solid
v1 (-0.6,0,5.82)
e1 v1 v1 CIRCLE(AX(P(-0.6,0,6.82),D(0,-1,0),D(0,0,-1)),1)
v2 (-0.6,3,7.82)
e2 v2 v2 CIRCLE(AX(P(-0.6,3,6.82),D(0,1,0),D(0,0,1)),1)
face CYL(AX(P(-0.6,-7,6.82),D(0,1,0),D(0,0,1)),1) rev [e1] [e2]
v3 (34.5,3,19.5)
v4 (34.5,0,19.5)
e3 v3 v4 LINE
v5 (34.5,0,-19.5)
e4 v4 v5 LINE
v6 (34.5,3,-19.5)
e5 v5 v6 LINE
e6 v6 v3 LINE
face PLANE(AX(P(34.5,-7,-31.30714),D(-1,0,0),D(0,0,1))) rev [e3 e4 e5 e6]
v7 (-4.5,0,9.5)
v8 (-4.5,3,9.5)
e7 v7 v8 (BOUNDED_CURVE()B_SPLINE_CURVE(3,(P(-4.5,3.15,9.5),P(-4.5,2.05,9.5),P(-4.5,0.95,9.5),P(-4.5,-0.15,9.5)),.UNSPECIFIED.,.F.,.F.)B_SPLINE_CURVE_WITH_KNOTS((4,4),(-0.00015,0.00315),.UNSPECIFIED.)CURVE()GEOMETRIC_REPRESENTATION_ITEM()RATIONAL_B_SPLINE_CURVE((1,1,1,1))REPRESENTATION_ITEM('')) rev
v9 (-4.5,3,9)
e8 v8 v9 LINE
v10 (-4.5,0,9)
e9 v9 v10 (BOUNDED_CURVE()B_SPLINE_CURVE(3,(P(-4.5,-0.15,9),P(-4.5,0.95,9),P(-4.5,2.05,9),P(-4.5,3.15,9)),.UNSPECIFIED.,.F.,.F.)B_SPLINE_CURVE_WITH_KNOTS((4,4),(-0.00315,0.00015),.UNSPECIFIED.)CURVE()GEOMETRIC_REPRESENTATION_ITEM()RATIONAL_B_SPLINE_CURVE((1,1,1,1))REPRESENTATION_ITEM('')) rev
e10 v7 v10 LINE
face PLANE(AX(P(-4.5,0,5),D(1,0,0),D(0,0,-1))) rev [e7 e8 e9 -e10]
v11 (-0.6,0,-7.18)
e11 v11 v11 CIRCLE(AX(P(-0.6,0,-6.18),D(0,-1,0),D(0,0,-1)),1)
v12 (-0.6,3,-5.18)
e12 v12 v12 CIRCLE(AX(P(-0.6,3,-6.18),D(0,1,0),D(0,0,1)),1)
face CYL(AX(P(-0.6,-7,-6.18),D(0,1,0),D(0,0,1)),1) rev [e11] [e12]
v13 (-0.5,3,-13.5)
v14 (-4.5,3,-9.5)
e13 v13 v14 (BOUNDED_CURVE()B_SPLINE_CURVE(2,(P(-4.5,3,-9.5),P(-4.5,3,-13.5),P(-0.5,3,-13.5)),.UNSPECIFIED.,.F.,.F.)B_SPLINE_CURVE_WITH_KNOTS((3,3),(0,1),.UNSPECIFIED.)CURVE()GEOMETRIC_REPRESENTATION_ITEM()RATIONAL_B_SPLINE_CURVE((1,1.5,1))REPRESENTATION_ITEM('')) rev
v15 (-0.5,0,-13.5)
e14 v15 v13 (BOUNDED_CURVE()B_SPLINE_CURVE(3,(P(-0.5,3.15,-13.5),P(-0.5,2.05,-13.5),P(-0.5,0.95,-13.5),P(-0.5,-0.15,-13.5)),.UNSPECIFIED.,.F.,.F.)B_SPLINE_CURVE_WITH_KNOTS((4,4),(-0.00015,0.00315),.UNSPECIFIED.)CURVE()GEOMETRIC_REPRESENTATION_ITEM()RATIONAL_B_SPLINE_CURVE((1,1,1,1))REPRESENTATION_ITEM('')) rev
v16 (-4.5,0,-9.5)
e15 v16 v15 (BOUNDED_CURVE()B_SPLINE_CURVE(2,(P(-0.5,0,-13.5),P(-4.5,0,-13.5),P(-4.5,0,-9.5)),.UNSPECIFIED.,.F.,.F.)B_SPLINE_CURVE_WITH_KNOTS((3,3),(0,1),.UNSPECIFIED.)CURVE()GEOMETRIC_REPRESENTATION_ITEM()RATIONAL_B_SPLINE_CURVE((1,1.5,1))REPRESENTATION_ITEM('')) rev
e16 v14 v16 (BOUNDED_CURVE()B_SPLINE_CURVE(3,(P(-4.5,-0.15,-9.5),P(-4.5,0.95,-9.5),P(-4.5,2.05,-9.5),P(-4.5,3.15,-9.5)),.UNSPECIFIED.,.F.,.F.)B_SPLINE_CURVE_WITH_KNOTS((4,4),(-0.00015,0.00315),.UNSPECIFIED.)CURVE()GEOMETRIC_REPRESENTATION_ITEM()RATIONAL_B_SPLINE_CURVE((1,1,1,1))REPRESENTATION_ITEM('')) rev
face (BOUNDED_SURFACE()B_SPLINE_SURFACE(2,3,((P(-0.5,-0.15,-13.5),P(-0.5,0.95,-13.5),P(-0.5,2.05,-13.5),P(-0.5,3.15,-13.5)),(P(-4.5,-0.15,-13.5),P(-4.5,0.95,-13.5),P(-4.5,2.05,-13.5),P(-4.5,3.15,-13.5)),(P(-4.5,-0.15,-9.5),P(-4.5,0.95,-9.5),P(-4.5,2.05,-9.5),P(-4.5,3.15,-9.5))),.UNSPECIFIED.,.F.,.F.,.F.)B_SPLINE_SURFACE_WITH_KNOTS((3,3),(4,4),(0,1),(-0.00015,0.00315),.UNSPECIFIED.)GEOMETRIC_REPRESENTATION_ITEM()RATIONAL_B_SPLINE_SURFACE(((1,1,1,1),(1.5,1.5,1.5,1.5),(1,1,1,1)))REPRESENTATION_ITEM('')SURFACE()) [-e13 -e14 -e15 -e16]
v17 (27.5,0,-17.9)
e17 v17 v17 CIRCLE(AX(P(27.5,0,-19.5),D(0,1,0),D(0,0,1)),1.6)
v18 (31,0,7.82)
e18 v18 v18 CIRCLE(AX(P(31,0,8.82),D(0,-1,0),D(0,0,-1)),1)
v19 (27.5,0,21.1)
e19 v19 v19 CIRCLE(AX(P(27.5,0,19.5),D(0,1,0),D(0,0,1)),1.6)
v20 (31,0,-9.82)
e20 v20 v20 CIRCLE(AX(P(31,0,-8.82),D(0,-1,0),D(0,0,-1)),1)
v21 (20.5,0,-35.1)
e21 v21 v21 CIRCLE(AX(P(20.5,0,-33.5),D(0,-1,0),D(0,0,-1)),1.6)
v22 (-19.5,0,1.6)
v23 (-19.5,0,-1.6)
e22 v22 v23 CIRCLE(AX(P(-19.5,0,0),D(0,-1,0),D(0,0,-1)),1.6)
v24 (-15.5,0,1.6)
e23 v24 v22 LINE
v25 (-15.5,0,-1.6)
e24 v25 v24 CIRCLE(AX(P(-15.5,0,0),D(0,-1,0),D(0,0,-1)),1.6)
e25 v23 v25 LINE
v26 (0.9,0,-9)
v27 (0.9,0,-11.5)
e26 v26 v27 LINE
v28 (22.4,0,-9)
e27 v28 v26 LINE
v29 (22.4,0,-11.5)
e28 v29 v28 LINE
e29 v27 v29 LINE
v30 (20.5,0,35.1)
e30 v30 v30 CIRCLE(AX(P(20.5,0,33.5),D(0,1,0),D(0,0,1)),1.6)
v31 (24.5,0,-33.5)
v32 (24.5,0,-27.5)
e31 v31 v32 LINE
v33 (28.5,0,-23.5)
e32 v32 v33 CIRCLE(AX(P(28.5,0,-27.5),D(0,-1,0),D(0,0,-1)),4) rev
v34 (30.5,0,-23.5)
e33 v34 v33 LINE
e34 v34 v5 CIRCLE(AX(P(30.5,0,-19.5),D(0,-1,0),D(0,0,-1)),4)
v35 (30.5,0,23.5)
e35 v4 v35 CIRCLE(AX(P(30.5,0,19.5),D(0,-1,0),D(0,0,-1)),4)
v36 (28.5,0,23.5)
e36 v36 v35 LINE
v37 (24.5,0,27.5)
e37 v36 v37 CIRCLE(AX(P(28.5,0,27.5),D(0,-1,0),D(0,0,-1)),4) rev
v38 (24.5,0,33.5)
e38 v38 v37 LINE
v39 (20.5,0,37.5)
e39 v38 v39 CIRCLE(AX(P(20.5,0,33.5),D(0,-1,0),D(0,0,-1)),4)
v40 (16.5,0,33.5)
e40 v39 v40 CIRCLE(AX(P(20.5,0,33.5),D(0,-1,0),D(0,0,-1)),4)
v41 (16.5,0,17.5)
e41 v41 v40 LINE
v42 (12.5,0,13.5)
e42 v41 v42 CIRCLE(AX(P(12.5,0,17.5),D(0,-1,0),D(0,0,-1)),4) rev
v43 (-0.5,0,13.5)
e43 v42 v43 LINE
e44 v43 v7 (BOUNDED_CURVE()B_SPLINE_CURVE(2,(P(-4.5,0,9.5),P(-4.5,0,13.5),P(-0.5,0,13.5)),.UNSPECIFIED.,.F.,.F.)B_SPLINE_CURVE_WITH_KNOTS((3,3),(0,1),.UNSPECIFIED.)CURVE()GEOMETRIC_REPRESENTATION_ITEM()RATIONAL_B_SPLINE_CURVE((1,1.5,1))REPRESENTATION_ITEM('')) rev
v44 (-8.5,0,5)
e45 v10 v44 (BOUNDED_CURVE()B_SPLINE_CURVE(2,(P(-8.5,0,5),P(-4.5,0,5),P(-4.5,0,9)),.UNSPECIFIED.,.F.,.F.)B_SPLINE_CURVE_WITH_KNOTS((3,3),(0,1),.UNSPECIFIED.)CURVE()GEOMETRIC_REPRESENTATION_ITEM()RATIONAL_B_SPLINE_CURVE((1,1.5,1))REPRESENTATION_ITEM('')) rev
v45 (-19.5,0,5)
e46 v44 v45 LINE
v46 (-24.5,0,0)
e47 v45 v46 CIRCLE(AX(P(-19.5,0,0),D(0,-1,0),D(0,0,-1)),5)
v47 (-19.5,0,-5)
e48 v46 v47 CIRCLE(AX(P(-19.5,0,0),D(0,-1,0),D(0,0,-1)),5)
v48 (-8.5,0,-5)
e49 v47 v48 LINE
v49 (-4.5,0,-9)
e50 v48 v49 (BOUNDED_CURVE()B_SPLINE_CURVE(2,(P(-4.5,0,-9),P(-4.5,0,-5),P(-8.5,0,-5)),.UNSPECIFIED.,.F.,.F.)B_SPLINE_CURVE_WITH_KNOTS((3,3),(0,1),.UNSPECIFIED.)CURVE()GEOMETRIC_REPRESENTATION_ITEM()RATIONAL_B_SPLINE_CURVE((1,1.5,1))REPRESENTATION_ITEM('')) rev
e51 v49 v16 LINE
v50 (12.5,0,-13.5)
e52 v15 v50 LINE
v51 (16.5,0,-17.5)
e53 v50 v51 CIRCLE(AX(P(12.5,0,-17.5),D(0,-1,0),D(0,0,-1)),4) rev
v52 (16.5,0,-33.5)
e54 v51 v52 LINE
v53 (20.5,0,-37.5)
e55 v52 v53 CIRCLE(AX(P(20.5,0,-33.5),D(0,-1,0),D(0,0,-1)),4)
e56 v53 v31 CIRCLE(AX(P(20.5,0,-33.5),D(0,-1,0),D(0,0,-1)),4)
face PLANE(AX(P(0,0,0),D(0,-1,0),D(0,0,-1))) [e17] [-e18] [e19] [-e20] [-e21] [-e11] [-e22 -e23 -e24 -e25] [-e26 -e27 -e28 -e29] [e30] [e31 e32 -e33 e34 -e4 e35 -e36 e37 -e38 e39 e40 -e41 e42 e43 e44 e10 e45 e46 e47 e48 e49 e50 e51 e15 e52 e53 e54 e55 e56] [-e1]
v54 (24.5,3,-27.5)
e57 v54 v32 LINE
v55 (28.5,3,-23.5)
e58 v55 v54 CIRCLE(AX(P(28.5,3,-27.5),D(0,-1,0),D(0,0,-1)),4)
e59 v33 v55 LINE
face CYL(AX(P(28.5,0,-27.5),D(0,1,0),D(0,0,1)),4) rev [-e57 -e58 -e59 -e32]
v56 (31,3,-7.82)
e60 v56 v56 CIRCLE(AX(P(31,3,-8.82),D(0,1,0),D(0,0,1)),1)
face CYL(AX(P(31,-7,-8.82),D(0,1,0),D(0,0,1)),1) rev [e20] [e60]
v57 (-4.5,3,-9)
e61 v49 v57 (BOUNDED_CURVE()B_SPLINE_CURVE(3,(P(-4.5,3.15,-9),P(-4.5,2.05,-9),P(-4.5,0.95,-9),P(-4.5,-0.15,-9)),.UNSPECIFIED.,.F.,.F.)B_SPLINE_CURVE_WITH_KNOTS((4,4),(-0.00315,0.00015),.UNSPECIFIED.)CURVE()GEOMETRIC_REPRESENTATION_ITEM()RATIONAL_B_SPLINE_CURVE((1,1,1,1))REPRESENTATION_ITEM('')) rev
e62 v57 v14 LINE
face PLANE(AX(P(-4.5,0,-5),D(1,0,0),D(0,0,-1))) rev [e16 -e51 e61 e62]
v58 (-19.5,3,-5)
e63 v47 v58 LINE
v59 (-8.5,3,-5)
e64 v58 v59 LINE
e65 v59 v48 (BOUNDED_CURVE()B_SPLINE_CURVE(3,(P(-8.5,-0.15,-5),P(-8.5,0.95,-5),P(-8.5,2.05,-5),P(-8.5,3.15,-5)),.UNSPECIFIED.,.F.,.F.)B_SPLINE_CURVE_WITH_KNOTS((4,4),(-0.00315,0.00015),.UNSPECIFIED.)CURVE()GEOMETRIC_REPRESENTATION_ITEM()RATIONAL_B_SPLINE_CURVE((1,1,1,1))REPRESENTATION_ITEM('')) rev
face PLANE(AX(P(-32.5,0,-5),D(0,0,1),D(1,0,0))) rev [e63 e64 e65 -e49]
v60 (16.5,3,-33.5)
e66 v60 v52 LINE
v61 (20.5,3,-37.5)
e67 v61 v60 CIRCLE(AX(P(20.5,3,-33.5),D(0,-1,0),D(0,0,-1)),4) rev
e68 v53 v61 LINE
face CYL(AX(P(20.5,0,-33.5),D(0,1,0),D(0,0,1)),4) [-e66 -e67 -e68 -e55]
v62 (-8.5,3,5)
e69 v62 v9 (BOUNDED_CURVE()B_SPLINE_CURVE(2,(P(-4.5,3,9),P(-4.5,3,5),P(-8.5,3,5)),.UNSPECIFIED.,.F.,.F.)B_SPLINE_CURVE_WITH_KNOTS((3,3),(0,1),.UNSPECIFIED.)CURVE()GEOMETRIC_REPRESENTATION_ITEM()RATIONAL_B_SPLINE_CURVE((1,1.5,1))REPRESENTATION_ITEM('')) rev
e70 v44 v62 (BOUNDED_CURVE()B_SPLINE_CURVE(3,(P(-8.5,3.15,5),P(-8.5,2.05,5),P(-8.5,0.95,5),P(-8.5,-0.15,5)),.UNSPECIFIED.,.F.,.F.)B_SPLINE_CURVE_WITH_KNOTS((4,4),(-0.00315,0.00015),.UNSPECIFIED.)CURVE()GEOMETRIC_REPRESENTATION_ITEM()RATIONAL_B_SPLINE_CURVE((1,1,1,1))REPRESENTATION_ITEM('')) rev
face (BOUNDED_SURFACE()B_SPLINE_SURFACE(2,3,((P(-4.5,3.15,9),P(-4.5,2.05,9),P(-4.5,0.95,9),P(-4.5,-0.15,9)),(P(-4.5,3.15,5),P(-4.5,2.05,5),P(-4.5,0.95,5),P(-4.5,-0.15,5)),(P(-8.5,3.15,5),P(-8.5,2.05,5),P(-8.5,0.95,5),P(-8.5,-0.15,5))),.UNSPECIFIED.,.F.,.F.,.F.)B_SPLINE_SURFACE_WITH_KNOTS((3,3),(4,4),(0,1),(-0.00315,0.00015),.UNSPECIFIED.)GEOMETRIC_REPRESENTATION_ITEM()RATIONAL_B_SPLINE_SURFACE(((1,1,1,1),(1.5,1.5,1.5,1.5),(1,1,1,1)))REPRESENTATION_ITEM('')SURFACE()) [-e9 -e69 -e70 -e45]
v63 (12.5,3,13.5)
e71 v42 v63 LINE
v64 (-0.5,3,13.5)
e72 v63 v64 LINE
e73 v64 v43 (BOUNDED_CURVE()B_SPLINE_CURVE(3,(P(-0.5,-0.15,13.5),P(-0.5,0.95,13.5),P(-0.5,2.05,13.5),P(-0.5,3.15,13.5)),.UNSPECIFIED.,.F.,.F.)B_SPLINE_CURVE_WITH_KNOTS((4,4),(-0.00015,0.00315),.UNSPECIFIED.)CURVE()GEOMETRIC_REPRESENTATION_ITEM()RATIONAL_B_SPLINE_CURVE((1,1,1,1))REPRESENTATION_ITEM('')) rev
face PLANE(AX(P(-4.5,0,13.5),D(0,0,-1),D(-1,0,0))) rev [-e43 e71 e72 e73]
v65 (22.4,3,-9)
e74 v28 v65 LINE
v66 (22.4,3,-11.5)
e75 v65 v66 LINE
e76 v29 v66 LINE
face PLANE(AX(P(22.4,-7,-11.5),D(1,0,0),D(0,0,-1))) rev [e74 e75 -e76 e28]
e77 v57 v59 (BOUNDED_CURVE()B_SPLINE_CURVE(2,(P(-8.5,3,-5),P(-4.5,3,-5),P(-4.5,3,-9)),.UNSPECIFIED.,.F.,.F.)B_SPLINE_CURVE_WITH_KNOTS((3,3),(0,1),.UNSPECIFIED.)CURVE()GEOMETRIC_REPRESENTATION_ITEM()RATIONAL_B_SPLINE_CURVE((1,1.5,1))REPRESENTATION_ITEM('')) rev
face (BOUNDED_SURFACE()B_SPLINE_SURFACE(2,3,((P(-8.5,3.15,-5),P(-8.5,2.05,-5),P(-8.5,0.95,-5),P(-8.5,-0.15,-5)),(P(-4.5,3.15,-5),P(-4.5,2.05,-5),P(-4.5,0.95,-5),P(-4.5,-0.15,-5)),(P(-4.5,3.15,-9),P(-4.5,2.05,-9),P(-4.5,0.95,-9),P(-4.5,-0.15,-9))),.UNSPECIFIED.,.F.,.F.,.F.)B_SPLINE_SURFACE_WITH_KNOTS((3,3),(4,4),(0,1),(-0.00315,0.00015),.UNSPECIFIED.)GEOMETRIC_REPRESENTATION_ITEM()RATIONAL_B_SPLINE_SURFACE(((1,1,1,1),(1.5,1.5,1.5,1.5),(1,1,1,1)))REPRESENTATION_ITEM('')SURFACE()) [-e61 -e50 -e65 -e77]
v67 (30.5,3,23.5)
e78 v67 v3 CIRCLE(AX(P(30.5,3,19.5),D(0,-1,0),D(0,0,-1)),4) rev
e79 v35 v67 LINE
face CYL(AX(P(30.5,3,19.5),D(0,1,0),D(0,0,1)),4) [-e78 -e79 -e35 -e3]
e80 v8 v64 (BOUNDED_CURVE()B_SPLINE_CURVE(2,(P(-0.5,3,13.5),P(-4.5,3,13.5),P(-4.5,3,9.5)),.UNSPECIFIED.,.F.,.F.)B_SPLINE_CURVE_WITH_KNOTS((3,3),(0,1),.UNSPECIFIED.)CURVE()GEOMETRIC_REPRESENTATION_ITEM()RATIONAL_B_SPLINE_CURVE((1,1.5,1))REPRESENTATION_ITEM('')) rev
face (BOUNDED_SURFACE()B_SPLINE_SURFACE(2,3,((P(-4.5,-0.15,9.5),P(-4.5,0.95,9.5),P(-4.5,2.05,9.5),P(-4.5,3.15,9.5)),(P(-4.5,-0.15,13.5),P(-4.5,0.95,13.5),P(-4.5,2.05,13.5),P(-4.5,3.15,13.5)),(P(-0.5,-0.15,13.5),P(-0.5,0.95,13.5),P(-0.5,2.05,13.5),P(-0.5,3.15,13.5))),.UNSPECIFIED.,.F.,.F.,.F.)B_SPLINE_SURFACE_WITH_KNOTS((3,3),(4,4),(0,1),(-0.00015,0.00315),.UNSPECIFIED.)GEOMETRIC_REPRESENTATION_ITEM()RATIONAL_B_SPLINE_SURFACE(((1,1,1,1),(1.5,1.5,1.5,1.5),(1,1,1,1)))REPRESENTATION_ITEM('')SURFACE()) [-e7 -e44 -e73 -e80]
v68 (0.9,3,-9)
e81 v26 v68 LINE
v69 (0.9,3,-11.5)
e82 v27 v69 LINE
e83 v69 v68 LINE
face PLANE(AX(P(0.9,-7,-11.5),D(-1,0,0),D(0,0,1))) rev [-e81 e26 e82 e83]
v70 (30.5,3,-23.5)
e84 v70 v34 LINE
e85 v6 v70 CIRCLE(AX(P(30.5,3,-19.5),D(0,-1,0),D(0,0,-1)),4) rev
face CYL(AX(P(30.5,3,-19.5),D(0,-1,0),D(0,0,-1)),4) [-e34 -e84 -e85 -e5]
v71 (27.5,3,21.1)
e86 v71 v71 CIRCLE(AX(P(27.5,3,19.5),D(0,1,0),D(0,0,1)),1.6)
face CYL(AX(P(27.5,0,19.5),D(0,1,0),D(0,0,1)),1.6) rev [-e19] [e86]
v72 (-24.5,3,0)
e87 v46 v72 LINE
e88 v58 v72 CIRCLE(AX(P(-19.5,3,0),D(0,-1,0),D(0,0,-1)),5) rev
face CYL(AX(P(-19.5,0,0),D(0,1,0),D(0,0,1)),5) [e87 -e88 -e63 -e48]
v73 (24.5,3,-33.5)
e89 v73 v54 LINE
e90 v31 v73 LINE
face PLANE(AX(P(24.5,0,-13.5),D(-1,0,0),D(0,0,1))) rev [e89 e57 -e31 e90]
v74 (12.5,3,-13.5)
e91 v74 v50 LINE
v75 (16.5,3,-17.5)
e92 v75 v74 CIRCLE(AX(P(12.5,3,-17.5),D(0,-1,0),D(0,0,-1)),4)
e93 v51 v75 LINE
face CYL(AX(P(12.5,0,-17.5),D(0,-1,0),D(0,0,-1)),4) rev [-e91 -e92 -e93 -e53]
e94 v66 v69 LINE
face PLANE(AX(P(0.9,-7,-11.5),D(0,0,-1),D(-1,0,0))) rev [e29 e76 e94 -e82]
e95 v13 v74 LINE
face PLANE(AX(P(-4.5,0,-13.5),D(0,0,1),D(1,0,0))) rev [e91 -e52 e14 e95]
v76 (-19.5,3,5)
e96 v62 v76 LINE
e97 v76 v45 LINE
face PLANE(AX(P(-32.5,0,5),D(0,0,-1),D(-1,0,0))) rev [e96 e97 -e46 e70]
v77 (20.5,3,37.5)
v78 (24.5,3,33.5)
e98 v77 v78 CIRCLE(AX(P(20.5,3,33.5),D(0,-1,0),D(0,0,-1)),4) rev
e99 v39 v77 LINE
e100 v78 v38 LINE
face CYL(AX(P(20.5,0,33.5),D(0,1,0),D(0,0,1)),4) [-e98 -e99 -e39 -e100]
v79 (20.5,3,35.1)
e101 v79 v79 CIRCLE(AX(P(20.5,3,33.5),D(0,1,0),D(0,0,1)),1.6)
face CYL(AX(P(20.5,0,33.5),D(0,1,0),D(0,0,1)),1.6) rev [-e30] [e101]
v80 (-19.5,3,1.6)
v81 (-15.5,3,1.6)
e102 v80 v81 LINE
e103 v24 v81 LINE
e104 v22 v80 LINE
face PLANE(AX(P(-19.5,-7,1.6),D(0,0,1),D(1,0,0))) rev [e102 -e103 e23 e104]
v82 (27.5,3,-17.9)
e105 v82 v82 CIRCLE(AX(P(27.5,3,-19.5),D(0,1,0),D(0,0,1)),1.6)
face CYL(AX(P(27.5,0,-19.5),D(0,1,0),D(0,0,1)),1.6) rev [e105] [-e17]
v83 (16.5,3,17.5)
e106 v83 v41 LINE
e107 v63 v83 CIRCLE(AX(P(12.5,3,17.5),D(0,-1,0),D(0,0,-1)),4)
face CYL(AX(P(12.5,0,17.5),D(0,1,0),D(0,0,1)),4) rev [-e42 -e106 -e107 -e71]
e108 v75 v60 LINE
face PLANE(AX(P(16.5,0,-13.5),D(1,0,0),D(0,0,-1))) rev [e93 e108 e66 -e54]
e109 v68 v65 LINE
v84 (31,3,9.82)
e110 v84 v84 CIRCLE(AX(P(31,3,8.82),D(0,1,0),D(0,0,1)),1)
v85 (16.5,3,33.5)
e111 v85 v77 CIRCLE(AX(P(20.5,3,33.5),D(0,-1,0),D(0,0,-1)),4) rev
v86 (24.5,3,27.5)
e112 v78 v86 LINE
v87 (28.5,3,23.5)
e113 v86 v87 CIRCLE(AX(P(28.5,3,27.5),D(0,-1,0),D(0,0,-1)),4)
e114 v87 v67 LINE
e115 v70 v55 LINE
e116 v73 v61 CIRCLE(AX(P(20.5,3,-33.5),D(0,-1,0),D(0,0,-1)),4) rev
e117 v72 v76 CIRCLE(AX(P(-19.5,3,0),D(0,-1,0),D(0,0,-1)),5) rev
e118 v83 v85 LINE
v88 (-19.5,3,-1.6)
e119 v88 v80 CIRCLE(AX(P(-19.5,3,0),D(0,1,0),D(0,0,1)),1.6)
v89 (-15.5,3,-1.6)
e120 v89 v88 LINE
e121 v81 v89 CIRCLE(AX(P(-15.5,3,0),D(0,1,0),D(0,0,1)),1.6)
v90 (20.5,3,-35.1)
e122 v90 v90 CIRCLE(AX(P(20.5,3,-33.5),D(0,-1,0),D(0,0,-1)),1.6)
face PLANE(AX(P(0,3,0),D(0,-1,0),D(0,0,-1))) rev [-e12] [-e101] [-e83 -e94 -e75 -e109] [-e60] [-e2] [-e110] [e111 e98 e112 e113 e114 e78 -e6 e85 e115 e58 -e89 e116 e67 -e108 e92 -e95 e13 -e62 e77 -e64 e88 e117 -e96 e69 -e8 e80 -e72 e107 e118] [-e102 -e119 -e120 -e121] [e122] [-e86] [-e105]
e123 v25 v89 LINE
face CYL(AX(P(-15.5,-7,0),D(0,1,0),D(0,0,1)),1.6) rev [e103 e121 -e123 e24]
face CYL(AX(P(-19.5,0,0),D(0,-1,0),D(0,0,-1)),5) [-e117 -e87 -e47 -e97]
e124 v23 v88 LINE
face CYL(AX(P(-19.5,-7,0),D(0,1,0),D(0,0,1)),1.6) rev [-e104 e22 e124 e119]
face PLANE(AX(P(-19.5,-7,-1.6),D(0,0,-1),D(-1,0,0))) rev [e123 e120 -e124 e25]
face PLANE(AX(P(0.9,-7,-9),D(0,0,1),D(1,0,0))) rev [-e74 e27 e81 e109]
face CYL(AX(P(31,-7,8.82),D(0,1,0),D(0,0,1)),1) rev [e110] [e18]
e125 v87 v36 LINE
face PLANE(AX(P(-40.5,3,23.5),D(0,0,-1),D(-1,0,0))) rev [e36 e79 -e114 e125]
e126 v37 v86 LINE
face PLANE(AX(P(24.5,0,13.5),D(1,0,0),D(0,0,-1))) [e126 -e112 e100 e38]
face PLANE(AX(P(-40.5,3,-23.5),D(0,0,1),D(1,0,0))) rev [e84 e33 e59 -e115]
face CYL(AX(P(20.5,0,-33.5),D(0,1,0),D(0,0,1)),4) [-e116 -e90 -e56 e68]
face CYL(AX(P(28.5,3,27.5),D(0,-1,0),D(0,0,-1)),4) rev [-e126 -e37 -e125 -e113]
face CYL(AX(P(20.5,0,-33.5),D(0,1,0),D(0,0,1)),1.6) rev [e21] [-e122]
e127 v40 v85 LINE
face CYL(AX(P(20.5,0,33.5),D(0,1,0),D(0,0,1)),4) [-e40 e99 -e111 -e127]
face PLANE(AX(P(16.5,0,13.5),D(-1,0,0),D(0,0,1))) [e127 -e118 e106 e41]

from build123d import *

# Parameters (mm, degrees)
CROQUIS1_W              = 81
CROQUIS1_H              = 47
SALIENTE_EXTRUIR1_DEPTH = 3
CORTAR_EXTRUIR2_DEPTH   = 47.920144927
CROQUIS2_R              = 1.6
CORTAR_EXTRUIR1_DEPTH   = 47.920144927
CROQUIS5_R              = 1
CROQUIS5_W              = 16
CROQUIS5_H              = 59.242740908
CROQUIS5_W_2            = 21.5
CROQUIS5_H_2            = 2.5
CORTAR_EXTRUIR4_DEPTH   = 10
CORTAR_EXTRUIR5_DEPTH   = 10
CROQUIS7_W              = 27.893037997
CROQUIS7_H              = 58.785327392
CORTAR_EXTRUIR6_DEPTH   = 10
CROQUIS8_W              = 8
CROQUIS8_H              = 24
CROQUIS8_R              = 1.6
SALIENTE_EXTRUIR2_DEPTH = 3
REDONDEO1_R             = 4
REDONDEO4_R             = 5
REDONDEO3_SIZE          = 4


# Some blends are built 0.0001 mm under size
with BuildPart() as part:
    # Croquis1 → Saliente-Extruir1 (new body)
    with BuildSketch(Plane(origin=(0, 0, 0), x_dir=(1, 0, 0), z_dir=(0, 1, 0))):
        Rectangle(CROQUIS1_W, CROQUIS1_H)
    extrude(amount=SALIENTE_EXTRUIR1_DEPTH)

    # Croquis3 → Cortar-Extruir2 (cut, through all)
    with BuildSketch(Plane(origin=(0, 3, 0), x_dir=(1, 0, 0), z_dir=(0, 1, 0))):
        Polygon((-32.5, 23.5), (23.5, 23.5), (23.5, 13.5), (-4.5, 13.5), (-4.5, 5), (-32.5, 5), align=None)
        Polygon((-32.5, -5), (-32.5, -23.5), (23.5, -23.5), (23.5, -13.5), (-4.5, -13.5), (-4.5, -5), align=None)
    extrude(amount=-CORTAR_EXTRUIR2_DEPTH, mode=Mode.SUBTRACT)

    # Croquis2 → Cortar-Extruir1 (cut, through all)
    with BuildSketch(Plane(origin=(0, 3, 0), x_dir=(1, 0, 0), z_dir=(0, 1, 0))):
        with Locations(Location((-36.5, 19.5, 0), (0, 0, 270))):
            Circle(CROQUIS2_R)
        with Locations(Location((-36.5, -19.5, 0), (0, 0, 270))):
            Circle(CROQUIS2_R)
        with Locations(Location((27.5, 19.5, 0), (0, 0, 270))):
            Circle(CROQUIS2_R)
        with Locations(Location((27.5, -19.5, 0), (0, 0, 270))):
            Circle(CROQUIS2_R)
        with Locations(Location((-36.5, 11.5, 0), (0, 0, 270))):
            Circle(CROQUIS2_R)
        with Locations(Location((-36.5, -11.5, 0), (0, 0, 270))):
            Circle(CROQUIS2_R)
    extrude(amount=-CORTAR_EXTRUIR1_DEPTH, mode=Mode.SUBTRACT)

    # Croquis5 → Cortar-Extruir4 (cut)
    with BuildSketch(Plane(origin=(0, 3, 0), x_dir=(1, 0, 0), z_dir=(0, 1, 0))):
        with Locations(Location((-0.6, 6.18, 0), (0, 0, 270))):
            Circle(CROQUIS5_R)
        with Locations(Location((31, 8.82, 0), (0, 0, 270))):
            Circle(CROQUIS5_R)
        with Locations(Location((31, -8.82, 0), (0, 0, 270))):
            Circle(CROQUIS5_R)
        with Locations(Location((-0.6, -6.82, 0), (0, 0, 270))):
            Circle(CROQUIS5_R)
        with Locations((42.5, 1.68576905)):
            Rectangle(CROQUIS5_W, CROQUIS5_H)
        with Locations((11.65, 10.25)):
            Rectangle(CROQUIS5_W_2, CROQUIS5_H_2)
    extrude(amount=-CORTAR_EXTRUIR4_DEPTH, mode=Mode.SUBTRACT)

    # Croquis6 → Cortar-Extruir5 (cut)
    with BuildSketch(Plane(origin=(0, 3, 0), x_dir=(1, 0, 0), z_dir=(0, 1, 0))):
        with BuildLine():
            Line((-19.5, 1.6), (-15.5, 1.6))
            ThreePointArc((-15.5, 1.6), (-13.9, 0), (-15.5, -1.6))
            Line((-15.5, -1.6), (-19.5, -1.6))
            ThreePointArc((-19.5, -1.6), (-21.1, 0), (-19.5, 1.6))
        make_face()
    extrude(amount=-CORTAR_EXTRUIR5_DEPTH, mode=Mode.SUBTRACT)

    # Croquis7 → Cortar-Extruir6 (cut)
    with BuildSketch(Plane(origin=(0, 3, 0), x_dir=(1, 0, 0), z_dir=(0, 1, 0))):
        with Locations((-38.446518998, -0.587422332)):
            Rectangle(CROQUIS7_W, CROQUIS7_H)
    extrude(amount=-CORTAR_EXTRUIR6_DEPTH, mode=Mode.SUBTRACT)

    # Croquis8 → Saliente-Extruir2 (add, through all)
    with BuildSketch(Plane(origin=(0, 3, 0), x_dir=(1, 0, 0), z_dir=(0, 1, 0))):
        with Locations((20.5, -25.5)):
            Rectangle(CROQUIS8_W, CROQUIS8_H)
        with Locations(Location((20.5, -33.5, 0), (0, 0, 270))):
            Circle(CROQUIS8_R, mode=Mode.SUBTRACT)
    saliente_extruir2 = extrude(amount=-SALIENTE_EXTRUIR2_DEPTH)

    # Simetría1: Saliente-Extruir2 across plane
    add(saliente_extruir2.mirror(Plane.XY))

    # Redondeo1
    redondeo1_edges = [part.edges().sort_by_distance(p)[0] for p in [
        (34.5, 1.5, 23.5),
        (34.5, 1.5, -23.5),
        (16.5, 1.5, 37.5),
        (24.5, 1.5, 37.5),
        (16.5, 1.5, 13.5),
        (24.5, 1.5, 23.5),
        (24.5, 1.5, -37.5),
        (16.5, 1.5, -37.5),
        (16.5, 1.5, -13.5),
        (24.5, 1.5, -23.5),
    ]]
    fillet(redondeo1_edges, radius=REDONDEO1_R - 0.0001)  # a hair under: the kernel refuses the full size

    # Redondeo4
    redondeo4_edges = [part.edges().sort_by_distance(p)[0] for p in [
        (-24.5, 1.5, -5),
        (-24.5, 1.5, 5),
    ]]
    fillet(redondeo4_edges, radius=REDONDEO4_R - 0.0001)  # a hair under: the kernel refuses the full size

    # Redondeo3
    # a fillet whose section is not a circle: 4 mm, written as the material it adds along each edge
    with BuildSketch(Plane(origin=(-4.5, 3, 5), x_dir=(-1, 0, 0), z_dir=(0, -1, 0))) as redondeo3_piece_1:
        with BuildLine():
            Bezier((REDONDEO3_SIZE, 0), (0, 0), (0, -REDONDEO3_SIZE), weights=[1, 1.5, 1])
            Line((0, -REDONDEO3_SIZE), (0, 0))
            Line((0, 0), (REDONDEO3_SIZE, 0))
        make_face()
    extrude(amount=3)
    with BuildSketch(Plane(origin=(-4.5, 3, -5), x_dir=(-1, 0, 0), z_dir=(0, -1, 0))) as redondeo3_piece_2:
        with BuildLine():
            Bezier((REDONDEO3_SIZE, 0), (0, 0), (0, REDONDEO3_SIZE), weights=[1, 1.5, 1])
            Line((0, REDONDEO3_SIZE), (0, 0))
            Line((0, 0), (REDONDEO3_SIZE, 0))
        make_face()
    extrude(amount=3)
    # a fillet whose section is not a circle: 4 mm, written as the material it takes off along each edge
    with BuildSketch(Plane(origin=(-4.5, 13, 13.5), x_dir=(0, 0, -1), z_dir=(0, -1, 0))) as redondeo3_2_piece_1:
        with BuildLine():
            Bezier((REDONDEO3_SIZE, 0), (0, 0), (0, REDONDEO3_SIZE), weights=[1, 1.5, 1])
            Line((0, REDONDEO3_SIZE), (0, 0))
            Line((0, 0), (REDONDEO3_SIZE, 0))
        make_face()
    extrude(amount=23, mode=Mode.SUBTRACT)
    with BuildSketch(Plane(origin=(-4.5, 13, -13.5), x_dir=(0, 0, 1), z_dir=(0, -1, 0))) as redondeo3_2_piece_2:
        with BuildLine():
            Bezier((REDONDEO3_SIZE, 0), (0, 0), (0, -REDONDEO3_SIZE), weights=[1, 1.5, 1])
            Line((0, -REDONDEO3_SIZE), (0, 0))
            Line((0, 0), (REDONDEO3_SIZE, 0))
        make_face()
    extrude(amount=23, mode=Mode.SUBTRACT)


solid = part.part
